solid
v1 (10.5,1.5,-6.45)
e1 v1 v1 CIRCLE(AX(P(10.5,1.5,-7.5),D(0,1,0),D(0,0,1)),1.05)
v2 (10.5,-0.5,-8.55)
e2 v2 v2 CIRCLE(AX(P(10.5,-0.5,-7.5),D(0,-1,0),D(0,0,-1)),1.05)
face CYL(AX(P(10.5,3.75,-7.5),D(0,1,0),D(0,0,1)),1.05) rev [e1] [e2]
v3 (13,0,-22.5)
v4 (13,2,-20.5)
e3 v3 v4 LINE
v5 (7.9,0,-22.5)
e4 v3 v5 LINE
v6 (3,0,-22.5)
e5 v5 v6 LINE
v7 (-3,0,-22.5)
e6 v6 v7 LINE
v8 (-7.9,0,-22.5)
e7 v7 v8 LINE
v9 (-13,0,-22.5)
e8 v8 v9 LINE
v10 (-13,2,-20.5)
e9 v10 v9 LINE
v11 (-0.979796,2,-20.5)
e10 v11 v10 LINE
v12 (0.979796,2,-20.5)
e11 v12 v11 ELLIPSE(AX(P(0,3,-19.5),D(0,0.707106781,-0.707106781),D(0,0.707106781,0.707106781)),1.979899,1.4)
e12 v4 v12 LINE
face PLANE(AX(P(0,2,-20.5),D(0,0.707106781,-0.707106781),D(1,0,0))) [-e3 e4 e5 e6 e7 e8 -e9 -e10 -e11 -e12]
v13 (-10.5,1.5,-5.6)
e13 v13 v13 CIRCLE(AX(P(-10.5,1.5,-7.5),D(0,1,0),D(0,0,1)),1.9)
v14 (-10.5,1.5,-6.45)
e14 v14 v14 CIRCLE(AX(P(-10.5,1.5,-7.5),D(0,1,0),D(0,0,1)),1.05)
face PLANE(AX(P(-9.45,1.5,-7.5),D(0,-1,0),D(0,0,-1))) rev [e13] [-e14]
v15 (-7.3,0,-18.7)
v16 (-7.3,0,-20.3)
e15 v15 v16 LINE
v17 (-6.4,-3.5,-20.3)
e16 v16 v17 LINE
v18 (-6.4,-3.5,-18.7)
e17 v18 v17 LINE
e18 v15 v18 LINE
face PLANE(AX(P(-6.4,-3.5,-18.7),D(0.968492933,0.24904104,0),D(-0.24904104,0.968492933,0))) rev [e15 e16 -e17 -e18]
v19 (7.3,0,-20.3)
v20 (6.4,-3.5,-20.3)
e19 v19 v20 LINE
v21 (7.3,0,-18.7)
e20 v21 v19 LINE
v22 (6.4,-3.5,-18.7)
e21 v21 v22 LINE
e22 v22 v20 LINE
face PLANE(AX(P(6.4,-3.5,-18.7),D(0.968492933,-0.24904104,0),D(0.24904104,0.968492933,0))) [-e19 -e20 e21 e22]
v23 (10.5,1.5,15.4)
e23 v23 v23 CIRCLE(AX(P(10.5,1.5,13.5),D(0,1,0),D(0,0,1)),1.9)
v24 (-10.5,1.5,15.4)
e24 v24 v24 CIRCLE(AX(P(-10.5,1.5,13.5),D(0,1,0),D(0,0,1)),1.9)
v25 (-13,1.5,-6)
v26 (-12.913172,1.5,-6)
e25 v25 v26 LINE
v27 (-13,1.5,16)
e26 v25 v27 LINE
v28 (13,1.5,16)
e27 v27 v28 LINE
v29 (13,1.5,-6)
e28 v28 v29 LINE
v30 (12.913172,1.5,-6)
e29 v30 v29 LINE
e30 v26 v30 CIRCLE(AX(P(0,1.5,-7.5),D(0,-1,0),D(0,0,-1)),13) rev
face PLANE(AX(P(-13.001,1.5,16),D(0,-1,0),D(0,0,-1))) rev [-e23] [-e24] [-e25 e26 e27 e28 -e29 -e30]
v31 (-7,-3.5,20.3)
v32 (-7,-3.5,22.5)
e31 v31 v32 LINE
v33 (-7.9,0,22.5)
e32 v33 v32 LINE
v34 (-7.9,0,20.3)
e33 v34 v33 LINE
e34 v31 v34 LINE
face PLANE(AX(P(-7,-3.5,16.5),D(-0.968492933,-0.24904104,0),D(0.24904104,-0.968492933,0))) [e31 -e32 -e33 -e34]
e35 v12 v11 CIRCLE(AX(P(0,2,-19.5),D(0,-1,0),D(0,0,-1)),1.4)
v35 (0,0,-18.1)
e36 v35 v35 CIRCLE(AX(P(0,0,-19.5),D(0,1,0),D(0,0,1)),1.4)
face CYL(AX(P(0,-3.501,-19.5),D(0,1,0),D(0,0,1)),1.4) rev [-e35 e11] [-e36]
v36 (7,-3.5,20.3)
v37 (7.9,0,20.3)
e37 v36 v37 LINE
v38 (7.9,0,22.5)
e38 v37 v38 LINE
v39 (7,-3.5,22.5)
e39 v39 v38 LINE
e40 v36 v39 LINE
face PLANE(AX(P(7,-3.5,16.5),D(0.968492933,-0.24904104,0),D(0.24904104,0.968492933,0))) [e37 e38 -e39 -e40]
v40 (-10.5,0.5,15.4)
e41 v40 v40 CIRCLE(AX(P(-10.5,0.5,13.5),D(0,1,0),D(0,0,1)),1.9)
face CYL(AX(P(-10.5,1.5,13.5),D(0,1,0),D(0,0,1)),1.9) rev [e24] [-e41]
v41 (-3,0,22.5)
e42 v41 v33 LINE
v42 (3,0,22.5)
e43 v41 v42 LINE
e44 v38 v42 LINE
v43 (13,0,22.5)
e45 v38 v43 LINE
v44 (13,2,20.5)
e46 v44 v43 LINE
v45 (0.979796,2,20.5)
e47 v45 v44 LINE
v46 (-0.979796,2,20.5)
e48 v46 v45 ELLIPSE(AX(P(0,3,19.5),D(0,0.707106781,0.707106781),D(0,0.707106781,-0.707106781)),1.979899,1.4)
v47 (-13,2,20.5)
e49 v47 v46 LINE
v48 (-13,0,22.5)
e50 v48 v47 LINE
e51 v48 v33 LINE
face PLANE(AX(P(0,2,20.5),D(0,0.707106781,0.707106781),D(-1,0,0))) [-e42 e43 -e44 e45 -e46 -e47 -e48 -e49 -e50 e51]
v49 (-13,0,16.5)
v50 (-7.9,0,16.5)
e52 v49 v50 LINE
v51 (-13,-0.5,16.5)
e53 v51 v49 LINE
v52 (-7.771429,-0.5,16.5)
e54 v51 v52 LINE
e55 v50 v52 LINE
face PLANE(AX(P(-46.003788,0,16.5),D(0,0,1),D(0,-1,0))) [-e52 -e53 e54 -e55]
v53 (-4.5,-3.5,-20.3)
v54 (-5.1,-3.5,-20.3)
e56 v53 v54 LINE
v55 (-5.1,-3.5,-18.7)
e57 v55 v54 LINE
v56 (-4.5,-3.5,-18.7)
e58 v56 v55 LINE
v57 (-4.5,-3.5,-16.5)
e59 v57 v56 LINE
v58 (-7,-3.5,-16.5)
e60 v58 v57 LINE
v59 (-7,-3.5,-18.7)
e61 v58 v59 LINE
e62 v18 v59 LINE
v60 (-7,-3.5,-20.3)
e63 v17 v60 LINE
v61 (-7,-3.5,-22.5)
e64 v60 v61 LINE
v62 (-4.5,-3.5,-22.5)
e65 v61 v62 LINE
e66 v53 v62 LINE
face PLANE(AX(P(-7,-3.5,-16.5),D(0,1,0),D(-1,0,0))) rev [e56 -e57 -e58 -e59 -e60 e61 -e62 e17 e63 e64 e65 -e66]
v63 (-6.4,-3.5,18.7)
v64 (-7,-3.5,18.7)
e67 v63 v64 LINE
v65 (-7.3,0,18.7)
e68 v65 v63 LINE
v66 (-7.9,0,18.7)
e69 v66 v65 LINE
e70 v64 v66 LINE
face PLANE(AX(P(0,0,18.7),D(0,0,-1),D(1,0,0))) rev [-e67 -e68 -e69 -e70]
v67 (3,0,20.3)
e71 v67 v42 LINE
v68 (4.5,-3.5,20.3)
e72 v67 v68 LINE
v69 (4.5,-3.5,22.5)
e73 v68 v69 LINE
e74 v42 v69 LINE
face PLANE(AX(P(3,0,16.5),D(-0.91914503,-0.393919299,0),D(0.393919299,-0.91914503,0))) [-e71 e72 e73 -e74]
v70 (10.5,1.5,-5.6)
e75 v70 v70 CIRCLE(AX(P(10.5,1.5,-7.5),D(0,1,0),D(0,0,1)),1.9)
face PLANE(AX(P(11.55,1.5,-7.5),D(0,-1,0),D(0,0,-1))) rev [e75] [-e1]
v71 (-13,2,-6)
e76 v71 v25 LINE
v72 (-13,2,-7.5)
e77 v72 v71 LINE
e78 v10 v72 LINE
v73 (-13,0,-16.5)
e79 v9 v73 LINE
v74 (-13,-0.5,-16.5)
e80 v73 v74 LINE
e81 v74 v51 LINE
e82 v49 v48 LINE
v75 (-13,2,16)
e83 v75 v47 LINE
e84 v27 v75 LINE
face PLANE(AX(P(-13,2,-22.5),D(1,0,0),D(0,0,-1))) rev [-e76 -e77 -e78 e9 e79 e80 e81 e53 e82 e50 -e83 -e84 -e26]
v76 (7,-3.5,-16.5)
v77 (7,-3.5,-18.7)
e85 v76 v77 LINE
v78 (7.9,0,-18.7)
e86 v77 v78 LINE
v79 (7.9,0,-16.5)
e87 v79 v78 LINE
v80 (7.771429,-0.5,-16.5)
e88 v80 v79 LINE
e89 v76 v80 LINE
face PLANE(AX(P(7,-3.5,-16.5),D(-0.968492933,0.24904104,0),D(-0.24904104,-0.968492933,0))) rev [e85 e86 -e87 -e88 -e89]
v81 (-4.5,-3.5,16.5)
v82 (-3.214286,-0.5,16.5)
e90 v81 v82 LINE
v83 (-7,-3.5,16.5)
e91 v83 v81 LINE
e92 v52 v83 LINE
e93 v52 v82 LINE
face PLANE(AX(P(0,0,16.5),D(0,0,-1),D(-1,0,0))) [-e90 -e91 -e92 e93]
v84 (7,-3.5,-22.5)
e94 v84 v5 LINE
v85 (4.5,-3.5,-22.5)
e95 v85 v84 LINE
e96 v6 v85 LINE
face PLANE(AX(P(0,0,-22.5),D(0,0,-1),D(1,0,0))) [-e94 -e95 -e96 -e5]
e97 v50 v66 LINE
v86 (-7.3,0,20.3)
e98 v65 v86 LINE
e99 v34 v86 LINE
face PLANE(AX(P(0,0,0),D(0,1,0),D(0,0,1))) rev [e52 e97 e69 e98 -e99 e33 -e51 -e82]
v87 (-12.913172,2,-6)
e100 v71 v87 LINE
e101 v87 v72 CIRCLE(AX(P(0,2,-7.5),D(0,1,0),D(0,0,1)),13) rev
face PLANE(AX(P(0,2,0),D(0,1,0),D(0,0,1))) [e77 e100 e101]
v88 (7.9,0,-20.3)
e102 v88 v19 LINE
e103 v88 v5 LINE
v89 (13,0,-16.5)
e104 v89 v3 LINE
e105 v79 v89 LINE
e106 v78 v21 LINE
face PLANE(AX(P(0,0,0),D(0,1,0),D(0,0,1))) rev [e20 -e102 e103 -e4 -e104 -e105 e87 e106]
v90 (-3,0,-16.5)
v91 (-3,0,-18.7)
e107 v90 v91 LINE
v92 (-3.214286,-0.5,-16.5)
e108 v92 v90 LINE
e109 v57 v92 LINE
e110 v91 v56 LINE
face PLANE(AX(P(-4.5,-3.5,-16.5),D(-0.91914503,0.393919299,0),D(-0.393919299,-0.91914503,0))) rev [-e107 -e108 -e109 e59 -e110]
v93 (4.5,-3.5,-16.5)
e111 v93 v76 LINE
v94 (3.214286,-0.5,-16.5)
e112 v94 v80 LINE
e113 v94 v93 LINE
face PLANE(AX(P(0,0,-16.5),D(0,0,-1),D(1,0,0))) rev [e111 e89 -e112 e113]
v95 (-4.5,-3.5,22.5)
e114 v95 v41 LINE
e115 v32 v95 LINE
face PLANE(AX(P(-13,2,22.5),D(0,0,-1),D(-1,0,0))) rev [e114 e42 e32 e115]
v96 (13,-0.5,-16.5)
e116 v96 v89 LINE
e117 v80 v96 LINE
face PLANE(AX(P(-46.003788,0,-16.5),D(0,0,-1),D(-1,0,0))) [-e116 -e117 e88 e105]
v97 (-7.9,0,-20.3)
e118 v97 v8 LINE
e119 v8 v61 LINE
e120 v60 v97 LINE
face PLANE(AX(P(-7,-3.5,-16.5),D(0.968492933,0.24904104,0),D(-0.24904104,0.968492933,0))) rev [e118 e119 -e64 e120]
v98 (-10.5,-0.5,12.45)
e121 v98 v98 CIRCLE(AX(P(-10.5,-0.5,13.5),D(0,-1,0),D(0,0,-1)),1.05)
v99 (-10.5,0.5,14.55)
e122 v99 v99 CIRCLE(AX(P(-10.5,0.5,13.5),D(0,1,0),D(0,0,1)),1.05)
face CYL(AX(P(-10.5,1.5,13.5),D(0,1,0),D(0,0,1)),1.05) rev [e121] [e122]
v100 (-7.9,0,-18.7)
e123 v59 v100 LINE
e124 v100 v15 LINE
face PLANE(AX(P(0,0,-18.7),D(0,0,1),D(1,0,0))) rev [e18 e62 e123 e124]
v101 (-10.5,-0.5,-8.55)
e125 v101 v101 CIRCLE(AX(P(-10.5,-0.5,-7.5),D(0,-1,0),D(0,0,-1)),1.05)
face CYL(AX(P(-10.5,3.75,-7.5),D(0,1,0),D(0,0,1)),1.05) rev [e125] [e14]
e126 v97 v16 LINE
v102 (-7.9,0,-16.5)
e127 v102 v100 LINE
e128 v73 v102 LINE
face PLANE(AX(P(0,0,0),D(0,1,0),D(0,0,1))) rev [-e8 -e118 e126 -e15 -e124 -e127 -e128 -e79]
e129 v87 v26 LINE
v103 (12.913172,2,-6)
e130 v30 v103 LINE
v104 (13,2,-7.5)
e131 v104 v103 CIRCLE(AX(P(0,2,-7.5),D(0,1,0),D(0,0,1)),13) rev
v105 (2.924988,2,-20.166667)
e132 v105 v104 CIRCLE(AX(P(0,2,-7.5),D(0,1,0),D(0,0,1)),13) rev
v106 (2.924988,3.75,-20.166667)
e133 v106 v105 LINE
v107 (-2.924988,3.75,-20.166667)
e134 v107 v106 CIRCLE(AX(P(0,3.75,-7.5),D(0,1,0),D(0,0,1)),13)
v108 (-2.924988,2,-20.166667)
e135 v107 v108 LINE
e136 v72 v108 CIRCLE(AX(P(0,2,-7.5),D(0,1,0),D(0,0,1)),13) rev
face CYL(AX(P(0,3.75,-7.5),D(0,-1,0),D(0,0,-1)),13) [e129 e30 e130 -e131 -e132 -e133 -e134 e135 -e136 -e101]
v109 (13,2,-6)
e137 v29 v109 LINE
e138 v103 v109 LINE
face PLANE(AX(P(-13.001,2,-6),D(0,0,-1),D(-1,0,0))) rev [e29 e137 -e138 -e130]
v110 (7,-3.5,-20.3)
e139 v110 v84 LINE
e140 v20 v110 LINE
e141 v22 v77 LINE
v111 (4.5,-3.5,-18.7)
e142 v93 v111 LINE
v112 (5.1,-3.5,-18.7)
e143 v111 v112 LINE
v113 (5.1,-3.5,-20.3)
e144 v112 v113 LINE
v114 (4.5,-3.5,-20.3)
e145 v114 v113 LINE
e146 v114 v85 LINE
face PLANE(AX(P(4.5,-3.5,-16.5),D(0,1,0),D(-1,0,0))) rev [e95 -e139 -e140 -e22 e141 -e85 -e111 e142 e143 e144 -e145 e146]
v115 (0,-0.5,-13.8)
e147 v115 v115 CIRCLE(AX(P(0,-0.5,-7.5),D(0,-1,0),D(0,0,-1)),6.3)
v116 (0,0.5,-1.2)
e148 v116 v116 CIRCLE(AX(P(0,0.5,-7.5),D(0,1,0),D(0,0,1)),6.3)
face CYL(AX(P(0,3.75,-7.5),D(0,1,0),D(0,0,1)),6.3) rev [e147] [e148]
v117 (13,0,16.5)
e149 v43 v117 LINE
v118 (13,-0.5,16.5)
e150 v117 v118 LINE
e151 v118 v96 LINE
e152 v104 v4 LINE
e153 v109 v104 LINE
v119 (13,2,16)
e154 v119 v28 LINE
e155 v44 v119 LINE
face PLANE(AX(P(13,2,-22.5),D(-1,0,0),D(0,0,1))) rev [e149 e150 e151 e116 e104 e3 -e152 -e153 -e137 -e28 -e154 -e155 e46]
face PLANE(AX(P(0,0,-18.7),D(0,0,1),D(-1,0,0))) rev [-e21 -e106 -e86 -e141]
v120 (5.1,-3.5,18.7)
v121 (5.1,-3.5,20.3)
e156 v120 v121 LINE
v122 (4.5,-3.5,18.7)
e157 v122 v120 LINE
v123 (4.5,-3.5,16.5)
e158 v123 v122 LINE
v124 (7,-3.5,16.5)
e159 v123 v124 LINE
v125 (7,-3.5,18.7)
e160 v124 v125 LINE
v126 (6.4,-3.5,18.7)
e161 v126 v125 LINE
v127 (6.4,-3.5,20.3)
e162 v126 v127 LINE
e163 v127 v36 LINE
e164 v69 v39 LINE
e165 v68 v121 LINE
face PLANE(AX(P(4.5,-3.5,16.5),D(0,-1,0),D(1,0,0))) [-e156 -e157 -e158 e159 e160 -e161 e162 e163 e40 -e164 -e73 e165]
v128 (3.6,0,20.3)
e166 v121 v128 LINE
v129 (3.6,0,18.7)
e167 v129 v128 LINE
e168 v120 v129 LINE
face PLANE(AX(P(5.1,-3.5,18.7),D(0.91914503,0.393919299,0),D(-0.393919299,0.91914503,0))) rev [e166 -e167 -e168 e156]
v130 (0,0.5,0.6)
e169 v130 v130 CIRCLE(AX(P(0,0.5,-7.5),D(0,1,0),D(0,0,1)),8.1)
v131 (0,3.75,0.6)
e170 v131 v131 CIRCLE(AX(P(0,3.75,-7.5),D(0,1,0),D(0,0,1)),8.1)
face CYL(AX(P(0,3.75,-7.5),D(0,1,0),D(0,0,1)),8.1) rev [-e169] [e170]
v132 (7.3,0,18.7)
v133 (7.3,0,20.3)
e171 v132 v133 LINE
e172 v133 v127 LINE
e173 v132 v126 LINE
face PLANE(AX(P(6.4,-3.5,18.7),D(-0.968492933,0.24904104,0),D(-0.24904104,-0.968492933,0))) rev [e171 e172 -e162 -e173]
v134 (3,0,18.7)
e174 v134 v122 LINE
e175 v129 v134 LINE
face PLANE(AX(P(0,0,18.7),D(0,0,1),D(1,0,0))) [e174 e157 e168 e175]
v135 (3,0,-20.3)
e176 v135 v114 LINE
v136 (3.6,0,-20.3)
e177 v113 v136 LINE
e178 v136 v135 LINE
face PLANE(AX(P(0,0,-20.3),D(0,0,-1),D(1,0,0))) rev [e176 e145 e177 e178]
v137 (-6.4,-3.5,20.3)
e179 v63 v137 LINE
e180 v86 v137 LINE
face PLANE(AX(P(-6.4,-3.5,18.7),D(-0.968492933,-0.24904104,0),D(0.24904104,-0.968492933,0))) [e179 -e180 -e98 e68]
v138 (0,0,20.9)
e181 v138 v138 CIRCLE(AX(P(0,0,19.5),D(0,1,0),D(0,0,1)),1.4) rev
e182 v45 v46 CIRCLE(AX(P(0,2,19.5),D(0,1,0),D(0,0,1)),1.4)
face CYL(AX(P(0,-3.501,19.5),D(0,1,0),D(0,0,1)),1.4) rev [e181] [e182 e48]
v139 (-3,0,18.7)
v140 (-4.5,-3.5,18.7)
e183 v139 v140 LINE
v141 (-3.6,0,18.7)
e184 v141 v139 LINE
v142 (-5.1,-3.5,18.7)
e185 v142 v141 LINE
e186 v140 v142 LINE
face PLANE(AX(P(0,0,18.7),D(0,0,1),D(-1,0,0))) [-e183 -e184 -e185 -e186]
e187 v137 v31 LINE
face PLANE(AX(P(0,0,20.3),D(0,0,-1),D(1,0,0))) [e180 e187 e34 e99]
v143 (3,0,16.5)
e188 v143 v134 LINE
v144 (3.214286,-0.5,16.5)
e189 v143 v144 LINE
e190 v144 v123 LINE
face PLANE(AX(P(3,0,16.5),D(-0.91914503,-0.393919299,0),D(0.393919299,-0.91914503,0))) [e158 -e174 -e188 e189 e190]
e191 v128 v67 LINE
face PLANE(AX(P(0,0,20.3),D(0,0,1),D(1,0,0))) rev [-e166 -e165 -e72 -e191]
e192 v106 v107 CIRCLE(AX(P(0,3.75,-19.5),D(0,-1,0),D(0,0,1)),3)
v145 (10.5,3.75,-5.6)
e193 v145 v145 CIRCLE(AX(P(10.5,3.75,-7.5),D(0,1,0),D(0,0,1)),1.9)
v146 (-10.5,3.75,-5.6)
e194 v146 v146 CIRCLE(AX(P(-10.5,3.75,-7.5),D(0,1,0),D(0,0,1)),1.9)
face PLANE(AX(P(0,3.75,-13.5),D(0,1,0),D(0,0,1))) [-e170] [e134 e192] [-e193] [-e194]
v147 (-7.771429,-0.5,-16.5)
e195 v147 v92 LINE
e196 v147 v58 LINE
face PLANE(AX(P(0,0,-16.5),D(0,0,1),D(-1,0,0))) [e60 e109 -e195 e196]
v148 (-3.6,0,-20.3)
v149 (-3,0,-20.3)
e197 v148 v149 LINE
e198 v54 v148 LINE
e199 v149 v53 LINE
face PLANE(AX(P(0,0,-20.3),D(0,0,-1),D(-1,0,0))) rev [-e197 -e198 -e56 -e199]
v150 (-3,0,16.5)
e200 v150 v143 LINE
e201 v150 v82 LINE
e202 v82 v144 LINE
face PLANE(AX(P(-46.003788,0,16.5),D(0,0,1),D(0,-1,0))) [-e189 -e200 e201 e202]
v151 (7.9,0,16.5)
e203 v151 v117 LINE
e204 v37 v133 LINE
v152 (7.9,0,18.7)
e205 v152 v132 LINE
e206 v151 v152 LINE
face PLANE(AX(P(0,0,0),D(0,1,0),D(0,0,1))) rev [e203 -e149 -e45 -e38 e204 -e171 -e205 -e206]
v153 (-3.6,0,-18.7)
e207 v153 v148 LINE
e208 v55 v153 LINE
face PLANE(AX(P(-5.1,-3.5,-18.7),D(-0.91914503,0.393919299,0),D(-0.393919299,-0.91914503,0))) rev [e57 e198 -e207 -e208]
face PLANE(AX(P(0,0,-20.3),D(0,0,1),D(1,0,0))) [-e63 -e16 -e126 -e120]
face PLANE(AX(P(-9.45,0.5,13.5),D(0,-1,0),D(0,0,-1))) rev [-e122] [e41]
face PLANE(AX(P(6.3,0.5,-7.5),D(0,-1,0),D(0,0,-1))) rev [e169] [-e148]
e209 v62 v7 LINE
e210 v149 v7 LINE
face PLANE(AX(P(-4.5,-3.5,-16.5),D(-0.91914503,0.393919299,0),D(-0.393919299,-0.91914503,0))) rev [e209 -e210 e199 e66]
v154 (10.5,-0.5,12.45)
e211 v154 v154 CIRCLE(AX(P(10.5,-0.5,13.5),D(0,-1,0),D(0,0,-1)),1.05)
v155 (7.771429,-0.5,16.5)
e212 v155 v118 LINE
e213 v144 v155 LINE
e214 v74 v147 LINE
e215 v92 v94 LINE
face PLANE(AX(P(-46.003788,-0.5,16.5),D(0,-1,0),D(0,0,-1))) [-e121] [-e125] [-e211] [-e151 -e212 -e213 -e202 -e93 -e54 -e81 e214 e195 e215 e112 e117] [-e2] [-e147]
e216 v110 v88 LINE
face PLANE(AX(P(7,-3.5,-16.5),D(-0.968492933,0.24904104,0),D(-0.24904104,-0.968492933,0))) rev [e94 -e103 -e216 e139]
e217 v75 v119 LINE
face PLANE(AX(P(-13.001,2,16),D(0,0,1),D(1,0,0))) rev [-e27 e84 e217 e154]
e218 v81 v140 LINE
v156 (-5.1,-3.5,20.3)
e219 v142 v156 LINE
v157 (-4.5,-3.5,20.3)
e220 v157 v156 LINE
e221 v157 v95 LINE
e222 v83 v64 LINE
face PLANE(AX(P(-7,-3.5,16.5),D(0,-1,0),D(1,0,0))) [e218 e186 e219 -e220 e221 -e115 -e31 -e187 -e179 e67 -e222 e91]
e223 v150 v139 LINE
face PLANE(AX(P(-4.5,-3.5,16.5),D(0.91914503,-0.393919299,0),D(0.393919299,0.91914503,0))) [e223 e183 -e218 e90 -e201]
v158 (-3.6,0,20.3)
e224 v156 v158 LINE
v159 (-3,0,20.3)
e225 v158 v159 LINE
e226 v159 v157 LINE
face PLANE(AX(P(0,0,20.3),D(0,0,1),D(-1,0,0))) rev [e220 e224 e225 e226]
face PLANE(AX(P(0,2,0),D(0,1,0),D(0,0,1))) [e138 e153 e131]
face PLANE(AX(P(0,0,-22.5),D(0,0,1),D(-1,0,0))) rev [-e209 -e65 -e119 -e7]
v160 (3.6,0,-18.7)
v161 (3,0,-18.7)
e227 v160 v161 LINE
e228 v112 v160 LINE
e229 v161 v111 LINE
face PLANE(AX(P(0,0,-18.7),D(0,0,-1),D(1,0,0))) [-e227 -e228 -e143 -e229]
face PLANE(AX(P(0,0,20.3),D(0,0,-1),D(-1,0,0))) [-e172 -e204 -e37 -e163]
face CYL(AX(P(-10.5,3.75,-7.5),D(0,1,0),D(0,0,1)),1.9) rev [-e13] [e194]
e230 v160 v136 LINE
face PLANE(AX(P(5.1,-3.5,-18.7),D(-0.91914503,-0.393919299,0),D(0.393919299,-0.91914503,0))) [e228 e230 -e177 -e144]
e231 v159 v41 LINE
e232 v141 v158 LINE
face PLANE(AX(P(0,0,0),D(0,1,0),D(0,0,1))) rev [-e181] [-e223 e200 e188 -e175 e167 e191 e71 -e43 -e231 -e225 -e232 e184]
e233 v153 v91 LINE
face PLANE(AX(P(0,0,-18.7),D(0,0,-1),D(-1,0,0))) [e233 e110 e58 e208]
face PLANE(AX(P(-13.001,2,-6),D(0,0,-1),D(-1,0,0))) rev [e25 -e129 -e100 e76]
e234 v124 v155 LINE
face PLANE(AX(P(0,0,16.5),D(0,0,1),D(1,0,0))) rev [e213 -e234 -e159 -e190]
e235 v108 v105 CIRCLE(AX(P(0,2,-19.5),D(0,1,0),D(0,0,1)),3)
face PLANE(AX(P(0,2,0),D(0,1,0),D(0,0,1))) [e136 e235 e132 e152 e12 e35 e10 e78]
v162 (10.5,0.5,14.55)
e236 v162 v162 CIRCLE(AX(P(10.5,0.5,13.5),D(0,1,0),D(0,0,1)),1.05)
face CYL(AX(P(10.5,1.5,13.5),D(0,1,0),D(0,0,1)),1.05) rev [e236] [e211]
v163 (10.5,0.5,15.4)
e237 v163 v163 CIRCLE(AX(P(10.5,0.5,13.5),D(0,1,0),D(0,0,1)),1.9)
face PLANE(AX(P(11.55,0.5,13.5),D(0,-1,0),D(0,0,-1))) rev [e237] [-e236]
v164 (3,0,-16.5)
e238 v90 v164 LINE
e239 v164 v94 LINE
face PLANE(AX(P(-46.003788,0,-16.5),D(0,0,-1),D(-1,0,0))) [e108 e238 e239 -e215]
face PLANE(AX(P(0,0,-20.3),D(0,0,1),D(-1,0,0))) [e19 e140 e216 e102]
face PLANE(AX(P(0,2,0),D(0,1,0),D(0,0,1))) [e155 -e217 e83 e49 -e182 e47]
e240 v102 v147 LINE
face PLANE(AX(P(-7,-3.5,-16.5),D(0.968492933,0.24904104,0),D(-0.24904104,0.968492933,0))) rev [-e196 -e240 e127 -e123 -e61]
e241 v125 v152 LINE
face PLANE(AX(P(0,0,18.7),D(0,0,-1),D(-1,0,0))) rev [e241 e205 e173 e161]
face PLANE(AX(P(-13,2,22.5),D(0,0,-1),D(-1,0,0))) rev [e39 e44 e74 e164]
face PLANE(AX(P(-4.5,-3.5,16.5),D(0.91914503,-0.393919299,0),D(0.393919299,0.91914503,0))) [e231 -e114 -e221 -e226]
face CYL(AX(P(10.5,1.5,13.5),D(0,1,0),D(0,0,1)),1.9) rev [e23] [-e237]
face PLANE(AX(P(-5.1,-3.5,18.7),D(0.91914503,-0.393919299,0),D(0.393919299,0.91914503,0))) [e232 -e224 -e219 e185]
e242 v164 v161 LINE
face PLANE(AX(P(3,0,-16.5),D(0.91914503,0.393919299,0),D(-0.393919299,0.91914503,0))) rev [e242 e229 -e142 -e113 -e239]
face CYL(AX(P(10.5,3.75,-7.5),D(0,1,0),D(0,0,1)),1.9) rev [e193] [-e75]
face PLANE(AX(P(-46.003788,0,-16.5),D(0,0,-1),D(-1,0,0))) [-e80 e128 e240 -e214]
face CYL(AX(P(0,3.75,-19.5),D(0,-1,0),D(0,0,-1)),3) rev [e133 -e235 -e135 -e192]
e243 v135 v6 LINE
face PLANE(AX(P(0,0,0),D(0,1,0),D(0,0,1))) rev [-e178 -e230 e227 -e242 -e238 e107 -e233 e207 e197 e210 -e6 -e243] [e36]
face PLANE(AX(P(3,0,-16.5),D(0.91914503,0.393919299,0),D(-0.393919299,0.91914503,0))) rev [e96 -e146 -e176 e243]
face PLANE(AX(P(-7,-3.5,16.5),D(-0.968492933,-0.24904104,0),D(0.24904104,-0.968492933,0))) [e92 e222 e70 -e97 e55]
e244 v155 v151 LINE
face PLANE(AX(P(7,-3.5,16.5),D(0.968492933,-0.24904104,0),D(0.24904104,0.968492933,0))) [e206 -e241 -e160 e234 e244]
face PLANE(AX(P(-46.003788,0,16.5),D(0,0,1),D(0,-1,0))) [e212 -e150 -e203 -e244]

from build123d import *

# Parameters (mm, degrees)
SKETCH_1_W                   = 26
SKETCH_1_H                   = 45
EXTRUDE_1_DEPTH              = 2
EXTRUDE_3_DEPTH              = 6
CUT_EXTRUDE_1_REACH          = 28.561
SKETCH_5_R                   = 1.4
EXTRUDE_4_REACH              = 36.562
SKETCH_6_W                   = 33
SKETCH_6_H                   = 0.5
CUT_EXTRUDE_2_REACH          = 36.562
SKETCH_7_W                   = 22
SKETCH_7_H                   = 0.5
HOLE_WIZARD_M2_1_D           = 2.1
HOLE_WIZARD_M2_1_CBORE_D     = 3.8
HOLE_WIZARD_M2_1_CBORE_DEPTH = 1
CHAMFER_1_SIZE               = 2
EXTRUDE_5_DEPTH              = 2.25
HOLE_WIZARD_M2_2_D           = 2.1
HOLE_WIZARD_M2_2_CBORE_D     = 3.8
HOLE_WIZARD_M2_2_CBORE_DEPTH = 2.25
HOLE_WIZARD_M2_3_D           = 12.6
HOLE_WIZARD_M2_3_CBORE_D     = 16.2
HOLE_WIZARD_M2_3_CBORE_DEPTH = 3.25
CUT_EXTRUDE_3_DEPTH          = 0.8
MIRROR_4_COPY_1_DEPTH        = 0.8


with BuildPart() as part:
    # ｽｹｯﾁ1 → ﾎﾞｽ - 押し出し1 (new body)
    with BuildSketch(Plane(origin=(0, 0, 0), x_dir=(1, 0, 0), z_dir=(0, 1, 0))):
        Rectangle(SKETCH_1_W, SKETCH_1_H)
    extrude(amount=EXTRUDE_1_DEPTH)

    # ｽｹｯﾁ4 → ﾎﾞｽ - 押し出し3 (add)
    with BuildSketch(Plane.XY.offset(22.5)):
        Polygon((-7, -3.5), (-4.5, -3.5), (-3, 0), (-7.9, 0), align=None)
        Polygon((3, 0), (4.5, -3.5), (7, -3.5), (7.9, 0), align=None)
    extrude_3 = extrude(amount=-EXTRUDE_3_DEPTH)

    # ｽｹｯﾁ5 → ｶｯﾄ - 押し出し1 (cut, up to next)
    with BuildSketch(Plane(origin=(0, 2, 0), x_dir=(1, 0, 0), z_dir=(0, 1, 0)), mode=Mode.PRIVATE) as cut_extrude_1_sk1:
        with Locations(Location((0, -19.5, 0), (0, 0, 270))):
            Circle(SKETCH_5_R)
    cut_extrude_1_tool1 = extrude(cut_extrude_1_sk1.sketch, amount=-CUT_EXTRUDE_1_REACH, mode=Mode.PRIVATE) & part.part
    cut_extrude_1 = cut_extrude_1_tool1.solids().sort_by_distance((0, 2, 19.5))[0]
    add(cut_extrude_1, mode=Mode.SUBTRACT)

    # ﾎﾞｽ - 押し出し4: up to this face of the body (flat: up to its plane)
    extrude_4_end = Plane(part.part.faces().sort_by_distance((-13, 1, 0))[0])
    # ｽｹｯﾁ6 → ﾎﾞｽ - 押し出し4 (add, up to the picked face)
    with BuildSketch(Plane(origin=(13, 0, 0), x_dir=(0, 0, -1), z_dir=(1, 0, 0)), mode=Mode.PRIVATE) as extrude_4_sk1:
        with Locations((0, -0.25)):
            Rectangle(SKETCH_6_W, SKETCH_6_H)
    extrude_4_tool1 = split(extrude(extrude_4_sk1.sketch, amount=-EXTRUDE_4_REACH, mode=Mode.PRIVATE), bisect_by=extrude_4_end, keep=Keep.BOTH, mode=Mode.PRIVATE)
    add(extrude_4_tool1.solids().sort_by(Axis((13, -0.25, 0), (-1, 0, 0)))[0])

    # ｽｹｯﾁ7 → ｶｯﾄ - 押し出し2 (cut, up to next)
    with BuildSketch(Plane(origin=(13, 0, 0), x_dir=(0, 0, -1), z_dir=(1, 0, 0)), mode=Mode.PRIVATE) as cut_extrude_2_sk1:
        with Locations((-5, 1.75)):
            Rectangle(SKETCH_7_W, SKETCH_7_H)
    cut_extrude_2_tool1 = extrude(cut_extrude_2_sk1.sketch, amount=-CUT_EXTRUDE_2_REACH, mode=Mode.PRIVATE) & part.part
    add(cut_extrude_2_tool1.solids().sort_by_distance((13, 1.75, 5))[0], mode=Mode.SUBTRACT)

    # M2 丸平ねじ用座ぐり穴1 (through all)
    with Locations(Plane(origin=(0, 1.5, 0), x_dir=(1, 0, 0), z_dir=(0, 1, 0))):
        with Locations((10.5, -13.5)):
            hole_wizard_m2_1 = CounterBoreHole(HOLE_WIZARD_M2_1_D / 2, HOLE_WIZARD_M2_1_CBORE_D / 2, HOLE_WIZARD_M2_1_CBORE_DEPTH)

    # 面取り1
    # the kernel refuses this chamfer: 2 mm, written as the material it takes off along each edge
    with BuildSketch(Plane(origin=(18.143365976, 2, 22.5), x_dir=(0, 0.027495876610586296, -0.9996219169112968), z_dir=(-1, 0, 0))) as chamfer_1_piece_1:
        Polygon((CHAMFER_1_SIZE * 0.999621916911, CHAMFER_1_SIZE * 0.0274958766106), (-CHAMFER_1_SIZE * 0.0274958766106, CHAMFER_1_SIZE * 0.999621916911), (0, 0), align=None)
    extrude(amount=36.286731952, mode=Mode.SUBTRACT)
    with BuildSketch(Plane(origin=(-18.143365976, 2, -22.5), x_dir=(0, -0.9996219169112968, -0.02749587661058563), z_dir=(1, 0, 0))) as chamfer_1_piece_2:
        Polygon((CHAMFER_1_SIZE * 0.999621916911, -CHAMFER_1_SIZE * 0.0274958766106), (-CHAMFER_1_SIZE * 0.0274958766106, -CHAMFER_1_SIZE * 0.999621916911), (0, 0), align=None)
    extrude(amount=36.286731952, mode=Mode.SUBTRACT)

    # ﾐﾗｰ1: ﾎﾞｽ - 押し出し3, ｶｯﾄ - 押し出し1 across plane
    add(extrude_3.mirror(Plane.XY))
    add(cut_extrude_1.mirror(Plane.XY), mode=Mode.SUBTRACT)

    # ｽｹｯﾁ11 → ﾎﾞｽ - 押し出し5 (add)
    with BuildSketch(Plane(origin=(0, 1.5, 0), x_dir=(1, 0, 0), z_dir=(0, 1, 0))):
        with BuildLine():
            ThreePointArc((-2.924988129, 20.166666667), (0, -5.5), (2.924988129, 20.166666667))
            ThreePointArc((2.924988129, 20.166666667), (0, 16.5), (-2.924988129, 20.166666667))
        make_face()
    extrude(amount=EXTRUDE_5_DEPTH)

    # M2 丸平ねじ用座ぐり穴2 (through all)
    with Locations(Plane(origin=(0, 3.75, 0), x_dir=(1, 0, 0), z_dir=(0, 1, 0))):
        with Locations((10.5, 7.5)):
            hole_wizard_m2_2 = CounterBoreHole(HOLE_WIZARD_M2_2_D / 2, HOLE_WIZARD_M2_2_CBORE_D / 2, HOLE_WIZARD_M2_2_CBORE_DEPTH)

    # M2 丸平ねじ用座ぐり穴3 (through all)
    with Locations(Plane(origin=(0, 3.75, 0), x_dir=(1, 0, 0), z_dir=(0, 1, 0))):
        with Locations((0, 7.5)):
            CounterBoreHole(HOLE_WIZARD_M2_3_D / 2, HOLE_WIZARD_M2_3_CBORE_D / 2, HOLE_WIZARD_M2_3_CBORE_DEPTH)

    # ﾐﾗｰ2: M2 丸平ねじ用座ぐり穴1, M2 丸平ねじ用座ぐり穴2 across plane
    add(hole_wizard_m2_1.mirror(Plane(origin=(0, 0, 0), x_dir=(0, 0, 1), z_dir=(1, 0, 0))), mode=Mode.SUBTRACT)
    add(hole_wizard_m2_2.mirror(Plane(origin=(0, 0, 0), x_dir=(0, 0, 1), z_dir=(1, 0, 0))), mode=Mode.SUBTRACT)

    # ｽｹｯﾁ17 → ｶｯﾄ - 押し出し3 (cut, symmetric)
    with BuildSketch(Plane.XY.offset(19.5)):
        Polygon((4.5, -3.5), (3, 0), (3.6, 0), (5.1, -3.5), align=None)
        Polygon((6.4, -3.5), (7, -3.5), (7.9, 0), (7.3, 0), align=None)
    cut_extrude_3 = extrude(amount=CUT_EXTRUDE_3_DEPTH, both=True, mode=Mode.SUBTRACT)

    # ﾐﾗｰ3: ｶｯﾄ - 押し出し3 across plane
    add(cut_extrude_3.mirror(Plane(origin=(0, 0, 0), x_dir=(0, 0, 1), z_dir=(1, 0, 0))), mode=Mode.SUBTRACT)

    # ﾐﾗｰ4: ｶｯﾄ - 押し出し3 across plane
    add(cut_extrude_3.mirror(Plane.XY), mode=Mode.SUBTRACT)

    # ﾐﾗｰ4 copy 1 sketch → ﾐﾗｰ4 copy 1 (cut, symmetric)
    with BuildSketch(Plane(origin=(0, 0, -19.5), x_dir=(-1, 0, 0), z_dir=(0, 0, -1))):
        Polygon((4.5, -3.5), (3, 0), (3.6, 0), (5.1, -3.5), align=None)
        Polygon((6.4, -3.5), (7, -3.5), (7.9, 0), (7.3, 0), align=None)
    extrude(amount=MIRROR_4_COPY_1_DEPTH, both=True, mode=Mode.SUBTRACT)


solid = part.part
